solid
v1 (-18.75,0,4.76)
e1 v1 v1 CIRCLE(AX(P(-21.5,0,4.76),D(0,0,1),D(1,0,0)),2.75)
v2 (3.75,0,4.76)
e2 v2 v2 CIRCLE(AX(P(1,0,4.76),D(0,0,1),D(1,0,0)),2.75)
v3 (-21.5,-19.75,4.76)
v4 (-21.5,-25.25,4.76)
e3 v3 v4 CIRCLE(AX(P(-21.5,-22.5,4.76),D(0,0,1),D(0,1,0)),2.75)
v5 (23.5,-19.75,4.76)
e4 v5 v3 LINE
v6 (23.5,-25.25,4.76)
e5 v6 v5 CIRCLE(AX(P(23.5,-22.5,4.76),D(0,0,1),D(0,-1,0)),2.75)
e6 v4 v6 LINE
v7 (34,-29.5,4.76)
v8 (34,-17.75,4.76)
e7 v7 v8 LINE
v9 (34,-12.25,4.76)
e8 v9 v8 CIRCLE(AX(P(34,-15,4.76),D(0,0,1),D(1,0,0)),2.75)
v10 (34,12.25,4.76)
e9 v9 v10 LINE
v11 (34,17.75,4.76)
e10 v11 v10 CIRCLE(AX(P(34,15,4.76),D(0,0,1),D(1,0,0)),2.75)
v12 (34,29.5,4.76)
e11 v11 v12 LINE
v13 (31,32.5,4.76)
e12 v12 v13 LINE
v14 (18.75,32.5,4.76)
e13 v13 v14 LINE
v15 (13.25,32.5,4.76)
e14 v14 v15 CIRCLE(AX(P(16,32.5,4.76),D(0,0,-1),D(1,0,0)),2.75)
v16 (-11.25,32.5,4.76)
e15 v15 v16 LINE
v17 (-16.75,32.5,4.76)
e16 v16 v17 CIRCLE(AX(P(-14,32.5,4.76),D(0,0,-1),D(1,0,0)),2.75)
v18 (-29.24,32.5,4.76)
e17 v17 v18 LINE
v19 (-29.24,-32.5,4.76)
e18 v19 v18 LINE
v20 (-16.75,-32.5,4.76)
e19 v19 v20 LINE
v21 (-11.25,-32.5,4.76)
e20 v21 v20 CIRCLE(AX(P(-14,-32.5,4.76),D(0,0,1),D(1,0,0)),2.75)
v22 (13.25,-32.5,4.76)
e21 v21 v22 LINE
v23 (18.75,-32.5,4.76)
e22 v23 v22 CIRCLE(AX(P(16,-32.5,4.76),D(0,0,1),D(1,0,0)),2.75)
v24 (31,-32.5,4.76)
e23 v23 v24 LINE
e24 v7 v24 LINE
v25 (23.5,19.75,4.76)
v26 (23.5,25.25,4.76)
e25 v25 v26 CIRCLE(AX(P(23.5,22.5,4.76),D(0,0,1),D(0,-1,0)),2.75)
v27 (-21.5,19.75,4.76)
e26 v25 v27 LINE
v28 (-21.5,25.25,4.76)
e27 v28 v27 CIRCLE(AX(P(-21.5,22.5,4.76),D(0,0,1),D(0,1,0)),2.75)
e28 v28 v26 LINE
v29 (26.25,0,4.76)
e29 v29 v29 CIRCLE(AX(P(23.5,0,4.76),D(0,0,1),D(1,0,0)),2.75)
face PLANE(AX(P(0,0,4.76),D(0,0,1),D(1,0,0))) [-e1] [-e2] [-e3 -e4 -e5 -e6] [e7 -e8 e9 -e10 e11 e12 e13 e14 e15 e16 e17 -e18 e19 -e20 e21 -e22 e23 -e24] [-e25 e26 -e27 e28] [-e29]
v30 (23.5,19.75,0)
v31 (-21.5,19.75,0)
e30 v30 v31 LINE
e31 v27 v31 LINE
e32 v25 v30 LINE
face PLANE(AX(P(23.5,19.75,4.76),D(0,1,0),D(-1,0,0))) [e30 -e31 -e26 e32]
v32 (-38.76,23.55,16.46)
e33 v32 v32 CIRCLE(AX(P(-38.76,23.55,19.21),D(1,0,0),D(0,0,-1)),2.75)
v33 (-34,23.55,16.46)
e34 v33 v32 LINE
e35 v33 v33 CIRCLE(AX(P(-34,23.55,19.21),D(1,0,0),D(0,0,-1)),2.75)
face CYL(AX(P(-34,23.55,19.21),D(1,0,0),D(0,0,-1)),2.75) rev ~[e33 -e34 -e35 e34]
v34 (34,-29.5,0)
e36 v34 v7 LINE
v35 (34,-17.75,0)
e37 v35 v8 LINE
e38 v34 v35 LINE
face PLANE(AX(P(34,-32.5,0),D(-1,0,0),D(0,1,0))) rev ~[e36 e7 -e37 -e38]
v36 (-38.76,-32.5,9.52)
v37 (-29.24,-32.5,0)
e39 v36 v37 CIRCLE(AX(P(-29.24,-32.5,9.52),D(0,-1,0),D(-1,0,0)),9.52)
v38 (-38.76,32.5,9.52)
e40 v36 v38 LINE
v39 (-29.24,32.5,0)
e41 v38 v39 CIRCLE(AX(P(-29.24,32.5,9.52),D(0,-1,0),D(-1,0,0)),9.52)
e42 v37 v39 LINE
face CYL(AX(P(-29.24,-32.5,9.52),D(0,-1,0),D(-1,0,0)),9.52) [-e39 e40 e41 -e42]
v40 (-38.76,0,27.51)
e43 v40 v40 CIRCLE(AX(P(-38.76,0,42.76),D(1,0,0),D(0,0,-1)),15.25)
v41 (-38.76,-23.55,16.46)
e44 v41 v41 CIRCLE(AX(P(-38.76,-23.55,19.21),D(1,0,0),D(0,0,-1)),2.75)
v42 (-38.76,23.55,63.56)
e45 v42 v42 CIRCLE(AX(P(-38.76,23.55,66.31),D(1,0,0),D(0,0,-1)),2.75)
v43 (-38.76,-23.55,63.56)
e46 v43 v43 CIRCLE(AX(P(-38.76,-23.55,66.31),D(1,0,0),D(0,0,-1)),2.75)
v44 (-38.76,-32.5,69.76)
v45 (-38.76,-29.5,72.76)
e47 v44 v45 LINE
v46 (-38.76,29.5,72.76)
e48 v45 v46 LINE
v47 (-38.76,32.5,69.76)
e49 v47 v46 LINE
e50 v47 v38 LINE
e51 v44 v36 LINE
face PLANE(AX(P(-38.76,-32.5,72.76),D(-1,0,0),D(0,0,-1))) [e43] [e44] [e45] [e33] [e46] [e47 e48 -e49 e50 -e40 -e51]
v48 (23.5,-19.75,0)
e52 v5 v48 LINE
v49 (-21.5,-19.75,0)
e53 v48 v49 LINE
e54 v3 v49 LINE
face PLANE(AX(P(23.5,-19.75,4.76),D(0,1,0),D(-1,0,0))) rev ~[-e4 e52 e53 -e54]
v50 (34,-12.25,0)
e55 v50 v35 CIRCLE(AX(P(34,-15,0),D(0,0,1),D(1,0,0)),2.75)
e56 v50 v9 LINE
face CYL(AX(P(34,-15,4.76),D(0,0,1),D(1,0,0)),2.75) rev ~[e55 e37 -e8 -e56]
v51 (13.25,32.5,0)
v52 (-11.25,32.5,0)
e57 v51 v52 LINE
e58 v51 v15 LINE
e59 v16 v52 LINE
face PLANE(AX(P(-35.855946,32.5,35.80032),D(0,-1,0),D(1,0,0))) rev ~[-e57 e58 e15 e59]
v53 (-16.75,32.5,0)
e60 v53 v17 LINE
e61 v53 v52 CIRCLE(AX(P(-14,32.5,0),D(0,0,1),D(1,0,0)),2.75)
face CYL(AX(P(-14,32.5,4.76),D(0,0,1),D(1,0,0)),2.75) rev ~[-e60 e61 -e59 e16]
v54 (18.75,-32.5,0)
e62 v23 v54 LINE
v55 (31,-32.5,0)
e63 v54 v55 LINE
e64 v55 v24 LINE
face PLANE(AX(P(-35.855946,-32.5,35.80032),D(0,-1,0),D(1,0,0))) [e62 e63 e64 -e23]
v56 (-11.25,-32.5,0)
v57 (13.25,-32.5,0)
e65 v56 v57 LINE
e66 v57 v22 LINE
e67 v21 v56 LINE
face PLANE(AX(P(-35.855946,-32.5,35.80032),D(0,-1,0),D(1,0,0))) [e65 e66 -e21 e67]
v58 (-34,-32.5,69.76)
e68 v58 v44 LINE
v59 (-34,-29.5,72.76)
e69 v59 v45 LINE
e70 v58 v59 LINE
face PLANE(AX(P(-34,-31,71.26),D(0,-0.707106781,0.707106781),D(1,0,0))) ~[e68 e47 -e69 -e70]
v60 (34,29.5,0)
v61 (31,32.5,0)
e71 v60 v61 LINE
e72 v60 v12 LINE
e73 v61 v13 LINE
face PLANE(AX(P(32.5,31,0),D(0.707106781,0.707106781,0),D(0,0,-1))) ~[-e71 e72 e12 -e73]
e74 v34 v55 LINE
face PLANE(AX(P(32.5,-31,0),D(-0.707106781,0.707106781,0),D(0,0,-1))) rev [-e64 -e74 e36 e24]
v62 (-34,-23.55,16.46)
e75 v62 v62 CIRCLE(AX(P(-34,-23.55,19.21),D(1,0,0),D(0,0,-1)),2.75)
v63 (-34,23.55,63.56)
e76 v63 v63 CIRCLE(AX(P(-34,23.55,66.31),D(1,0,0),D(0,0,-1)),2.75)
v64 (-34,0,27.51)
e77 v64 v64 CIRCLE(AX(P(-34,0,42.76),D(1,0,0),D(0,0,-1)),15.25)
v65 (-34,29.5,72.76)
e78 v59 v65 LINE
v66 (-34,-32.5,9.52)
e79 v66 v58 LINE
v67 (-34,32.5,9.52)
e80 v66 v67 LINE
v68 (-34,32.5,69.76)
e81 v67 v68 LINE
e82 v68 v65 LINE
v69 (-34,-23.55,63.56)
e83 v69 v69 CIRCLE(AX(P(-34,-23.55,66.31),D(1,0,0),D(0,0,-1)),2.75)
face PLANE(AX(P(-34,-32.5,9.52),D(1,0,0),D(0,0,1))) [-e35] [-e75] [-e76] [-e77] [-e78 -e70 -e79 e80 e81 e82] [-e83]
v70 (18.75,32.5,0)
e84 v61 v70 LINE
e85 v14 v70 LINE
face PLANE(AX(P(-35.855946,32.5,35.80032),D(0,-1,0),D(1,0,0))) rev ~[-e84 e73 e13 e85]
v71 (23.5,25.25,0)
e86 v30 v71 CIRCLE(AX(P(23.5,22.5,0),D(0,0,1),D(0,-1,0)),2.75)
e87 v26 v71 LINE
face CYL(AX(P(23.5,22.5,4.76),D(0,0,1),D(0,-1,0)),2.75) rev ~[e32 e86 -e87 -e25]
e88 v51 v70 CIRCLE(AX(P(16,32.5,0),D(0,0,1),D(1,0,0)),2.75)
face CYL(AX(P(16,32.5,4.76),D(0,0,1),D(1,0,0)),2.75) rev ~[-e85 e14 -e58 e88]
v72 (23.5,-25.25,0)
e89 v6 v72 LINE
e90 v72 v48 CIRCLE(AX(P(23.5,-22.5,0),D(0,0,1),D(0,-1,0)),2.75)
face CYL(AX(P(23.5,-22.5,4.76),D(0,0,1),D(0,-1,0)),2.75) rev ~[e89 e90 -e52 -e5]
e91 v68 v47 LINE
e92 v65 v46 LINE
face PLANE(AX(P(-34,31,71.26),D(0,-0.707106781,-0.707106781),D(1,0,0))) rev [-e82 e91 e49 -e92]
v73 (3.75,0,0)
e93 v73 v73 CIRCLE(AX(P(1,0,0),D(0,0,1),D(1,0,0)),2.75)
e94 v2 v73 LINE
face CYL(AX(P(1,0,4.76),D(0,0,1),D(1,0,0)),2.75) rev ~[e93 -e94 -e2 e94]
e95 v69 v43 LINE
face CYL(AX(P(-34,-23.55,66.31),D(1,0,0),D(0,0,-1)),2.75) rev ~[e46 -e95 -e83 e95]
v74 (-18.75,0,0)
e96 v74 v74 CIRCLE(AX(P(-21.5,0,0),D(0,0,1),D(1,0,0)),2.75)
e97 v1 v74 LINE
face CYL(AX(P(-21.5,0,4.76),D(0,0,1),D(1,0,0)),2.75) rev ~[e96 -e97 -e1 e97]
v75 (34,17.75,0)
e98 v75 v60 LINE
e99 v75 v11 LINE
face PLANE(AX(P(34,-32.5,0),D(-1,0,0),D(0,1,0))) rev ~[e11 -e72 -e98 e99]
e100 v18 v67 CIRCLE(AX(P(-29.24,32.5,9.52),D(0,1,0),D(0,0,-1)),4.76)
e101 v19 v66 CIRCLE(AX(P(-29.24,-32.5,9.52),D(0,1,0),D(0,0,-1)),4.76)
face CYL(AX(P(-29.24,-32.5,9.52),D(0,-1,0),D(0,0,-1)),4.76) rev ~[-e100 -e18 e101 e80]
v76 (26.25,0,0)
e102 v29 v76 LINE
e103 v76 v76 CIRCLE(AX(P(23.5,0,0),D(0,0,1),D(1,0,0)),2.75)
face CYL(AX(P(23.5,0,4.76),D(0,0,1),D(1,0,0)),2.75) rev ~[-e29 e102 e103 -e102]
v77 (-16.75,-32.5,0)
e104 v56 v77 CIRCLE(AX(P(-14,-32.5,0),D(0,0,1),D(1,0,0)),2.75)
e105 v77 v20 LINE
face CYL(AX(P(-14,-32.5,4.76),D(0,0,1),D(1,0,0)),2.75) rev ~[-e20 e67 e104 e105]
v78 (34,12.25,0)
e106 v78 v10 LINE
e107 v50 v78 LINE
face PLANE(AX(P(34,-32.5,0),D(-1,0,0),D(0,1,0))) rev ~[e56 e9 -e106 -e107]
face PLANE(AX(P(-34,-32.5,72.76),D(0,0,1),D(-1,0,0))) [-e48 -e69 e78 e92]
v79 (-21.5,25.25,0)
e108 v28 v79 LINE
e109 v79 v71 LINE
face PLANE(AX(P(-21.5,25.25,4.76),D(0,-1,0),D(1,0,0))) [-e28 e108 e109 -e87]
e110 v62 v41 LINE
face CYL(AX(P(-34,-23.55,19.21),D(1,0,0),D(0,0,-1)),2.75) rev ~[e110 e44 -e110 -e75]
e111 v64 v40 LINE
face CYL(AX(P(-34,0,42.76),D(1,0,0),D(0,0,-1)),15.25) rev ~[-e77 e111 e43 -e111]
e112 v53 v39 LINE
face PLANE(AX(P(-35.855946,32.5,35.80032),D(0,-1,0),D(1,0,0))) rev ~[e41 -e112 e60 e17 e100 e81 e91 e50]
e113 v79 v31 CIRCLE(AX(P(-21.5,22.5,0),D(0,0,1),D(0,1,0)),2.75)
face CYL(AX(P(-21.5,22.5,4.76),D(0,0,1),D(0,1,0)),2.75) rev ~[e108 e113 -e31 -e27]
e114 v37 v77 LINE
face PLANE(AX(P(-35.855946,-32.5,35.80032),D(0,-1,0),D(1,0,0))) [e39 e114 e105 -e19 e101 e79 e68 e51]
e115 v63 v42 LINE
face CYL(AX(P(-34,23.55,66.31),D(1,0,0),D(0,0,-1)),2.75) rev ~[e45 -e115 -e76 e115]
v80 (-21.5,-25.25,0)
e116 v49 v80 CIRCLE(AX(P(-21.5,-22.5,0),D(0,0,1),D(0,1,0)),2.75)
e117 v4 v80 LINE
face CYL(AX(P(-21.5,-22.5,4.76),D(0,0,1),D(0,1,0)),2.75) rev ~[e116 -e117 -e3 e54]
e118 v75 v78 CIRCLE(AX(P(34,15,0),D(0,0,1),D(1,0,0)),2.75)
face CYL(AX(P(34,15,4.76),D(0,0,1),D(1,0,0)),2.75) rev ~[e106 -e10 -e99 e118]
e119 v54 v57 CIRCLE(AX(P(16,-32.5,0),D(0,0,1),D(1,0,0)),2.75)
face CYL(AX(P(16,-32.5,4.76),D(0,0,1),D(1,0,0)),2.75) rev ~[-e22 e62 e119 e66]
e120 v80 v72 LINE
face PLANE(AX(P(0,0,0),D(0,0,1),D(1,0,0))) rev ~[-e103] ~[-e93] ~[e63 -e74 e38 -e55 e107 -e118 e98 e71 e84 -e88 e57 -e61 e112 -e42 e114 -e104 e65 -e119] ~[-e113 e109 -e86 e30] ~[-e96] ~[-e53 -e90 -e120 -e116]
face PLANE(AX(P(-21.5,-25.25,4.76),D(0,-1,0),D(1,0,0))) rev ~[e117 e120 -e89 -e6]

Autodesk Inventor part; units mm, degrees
ref_plane "YZ Plane" through (0, 0, 0) normal (1, 0, 0) x (0, 1, 0)
ref_plane "XZ Plane" through (0, 0, 0) normal (0, 1, 0) x (-1, 0, 0)
ref_plane "XY Plane" through (0, 0, 0) normal (0, 0, 1) x (1, 0, 0)
sketch "Sketch1" plane through (0, 0, 0) normal (0, 0, 1) x (1, 0, 0)
  line L0 (-34, -32.5) -> (34, -32.5)
  line L1 (34, -32.5) -> (34, 32.5)
  line L2 (34, 32.5) -> (-34, 32.5)
  line L3 (-34, 32.5) -> (-34, -32.5)
  line L4 (-34, -32.5) -> (34, 32.5) construction
  line L5 (34, -32.5) -> (-34, 32.5) construction
  point P0 (0, 0)
  dimension "d0" = 68
  dimension "d1" = 65
extrude "Plate1" add sketch "Sketch1" along normal blind 4.76
sketch "Sketch2" plane through (-34, -32.5, 4.76) normal (-1, 0, 0) x (0, -1, 0)
  line L0 (-65, 0) -> (0, 0)
  line L1 (0, 0) -> (0, 68)
  line L2 (0, 68) -> (-65, 68)
  line L3 (-65, 68) -> (-65, 0)
edge flange "Flange1" height 72.76 angle 90 thickness 4.76 bend radius 4.76 thickness toward (-1, 0, 0) relief tear relief width 4.76 relief depth 2.38 edges at (-34, 0, 4.76) wall of the first edge with corners at (-34, 32.5, 4.76) (-34, -32.5, 4.76) (-34, -32.5, 72.76) (-34, 32.5, 72.76)
bend "Bend1"
corner "Corner1"
sketch "Sketch3" plane through (0, 0, 4.76) normal (0, 0, 1) x (1, 0, 0)
  line L0 (-29.24, 32.5) -> (-29.24, -32.5) construction
  line L1 (34, -32.5) -> (-29.24, -32.5) construction
  line L2 (34, 32.5) -> (34, -32.5) construction
  line L3 (-29.24, 32.5) -> (34, 32.5) construction
  line L4 (-29.24, 32.5) -> (34, 32.5) projected
  circle A0 centre (-14, 32.5) radius 2.75
  circle A1 centre (16, 32.5) radius 2.75
  line L5 (34, 32.5) -> (34, -32.5) construction
  line L6 (34, 0) -> (-29.24, 0) construction
  line L7 (-29.24, 32.5) -> (-29.24, -32.5) construction
  arc A2 (-21.5, 25.25) -> (-21.5, 19.75) centre (-21.5, 22.5) ccw
  arc A3 (20.75, 22.5) -> (23.5, 19.75) centre (23.5, 22.5) ccw construction
  line L8 (-21.5, 22.5) -> (23.5, 22.5) construction
  line L9 (-21.5, 25.25) -> (23.5, 25.25)
  line L10 (23.5, 19.75) -> (-21.5, 19.75)
  arc A4 (-18.75, 22.5) -> (-21.5, 25.25) centre (-21.5, 22.5) ccw construction
  arc A5 (-21.5, 19.75) -> (-18.75, 22.5) centre (-21.5, 22.5) ccw construction
  arc A6 (23.5, 25.25) -> (20.75, 22.5) centre (23.5, 22.5) ccw construction
  arc A7 (23.5, 19.75) -> (23.5, 25.25) centre (23.5, 22.5) ccw
  circle A8 centre (34, 15) radius 2.75
  circle A9 centre (-14, -32.5) radius 2.75
  circle A10 centre (16, -32.5) radius 2.75
  arc A11 (-21.5, -19.75) -> (-21.5, -25.25) centre (-21.5, -22.5) ccw
  line L11 (-21.5, -25.25) -> (23.5, -25.25)
  line L12 (23.5, -19.75) -> (-21.5, -19.75)
  arc A12 (23.5, -25.25) -> (23.5, -19.75) centre (23.5, -22.5) ccw
  circle A13 centre (34, -15) radius 2.75
  line L13 (-21.5, 22.5) -> (-21.5, -22.5) construction
  line L14 (23.5, 22.5) -> (23.5, -22.5) construction
  line L15 (23.5, -22.5) -> (-21.5, -22.5) construction
  line L16 (1, -22.5) -> (1, 22.5) construction
  circle A14 centre (-21.5, 0) radius 2.75
  circle A15 centre (1, 0) radius 2.75
  circle A16 centre (23.5, 0) radius 2.75
  point P0 (0, 0)
  dimension "d13" = 5.5
  dimension "d14" = 30
  dimension "d15" = 18
  dimension "d16" = 5.5
  dimension "d17" = 45
  dimension "d18" = 10.5
  dimension "d19" = 45
  dimension "d20" = 30
extrude "Cut1" cut sketch "Sketch3" against normal blind 4.76
sketch "Sketch4" plane through (-34, -32.5, 72.76) normal (1, 0, 0) x (0, 0, -1)
  line L0 (63.24, 0) -> (63.24, 65) construction
  line L1 (0, 65) -> (63.24, 65) construction
  line L2 (0, 65) -> (0, 0) construction
  line L3 (0, 0) -> (63.24, 0) construction
  line L4 (0, 65) -> (0, 0) construction
  line L5 (0, 32.5) -> (63.24, 32.5) construction
  circle A0 centre (30, 32.5) radius 15.25
  line L6 (53.55, 8.95) -> (6.45, 8.95) construction
  line L7 (6.45, 8.95) -> (6.45, 56.05) construction
  line L8 (6.45, 56.05) -> (53.55, 56.05) construction
  line L9 (53.55, 56.05) -> (53.55, 8.95) construction
  line L10 (53.55, 8.95) -> (6.45, 56.05) construction
  line L11 (6.45, 8.95) -> (53.55, 56.05) construction
  circle A1 centre (6.45, 8.95) radius 2.75
  circle A2 centre (6.45, 56.05) radius 2.75
  circle A3 centre (53.55, 56.05) radius 2.75
  circle A4 centre (53.55, 8.95) radius 2.75
  point P0 (72.76, 32.5)
  dimension "d23" = 30
  dimension "d24" = 30.5
  dimension "d25" = 47.1
  dimension "d26" = 5.5
extrude "Cut2" cut sketch "Sketch4" against normal blind 4.76
chamfer "Corner Chamfer1" distance 3 angle 45 4 edges at (-36.38, 32.5, 72.76) (-36.38, -32.5, 72.76) (34, -32.5, 2.38) (34, 32.5, 2.38)
equation "\"d21\" = Thickness"
equation "\"d27\" = Thickness"
equation "\"d3\" = BendReliefWidth"
equation "\"d4\" = BendReliefDepth"
equation "\"d5\" = MinimumRemnant"
equation "\"d6\" = BendRadius"
equation "\"d9\" = BendRadius"
equation "\"d10\" = CornerReliefSize"
equation "\"d11\" = GapSize"
equation "\"d12\" = JacobiRadiusSize"
equation "\"BendRadius\" = Thickness"
equation "\"BendReliefWidth\" = Thickness"
equation "\"BendReliefDepth\" = 0.5 * Thickness"
equation "\"CornerReliefSize\" = 4 * Thickness"
equation "\"MinimumRemnant\" = 2 * Thickness"
equation "\"TransitionRadius\" = BendRadius"
equation "\"JacobiRadiusSize\" = BendRadius"
equation "\"GapSize\" = Thickness"
equation "\"d2\" = BendRadius"
equation "\"Thickness\" = 4.76"
properties part number "nema_support_techmakers" material "Steel, Alloy"
